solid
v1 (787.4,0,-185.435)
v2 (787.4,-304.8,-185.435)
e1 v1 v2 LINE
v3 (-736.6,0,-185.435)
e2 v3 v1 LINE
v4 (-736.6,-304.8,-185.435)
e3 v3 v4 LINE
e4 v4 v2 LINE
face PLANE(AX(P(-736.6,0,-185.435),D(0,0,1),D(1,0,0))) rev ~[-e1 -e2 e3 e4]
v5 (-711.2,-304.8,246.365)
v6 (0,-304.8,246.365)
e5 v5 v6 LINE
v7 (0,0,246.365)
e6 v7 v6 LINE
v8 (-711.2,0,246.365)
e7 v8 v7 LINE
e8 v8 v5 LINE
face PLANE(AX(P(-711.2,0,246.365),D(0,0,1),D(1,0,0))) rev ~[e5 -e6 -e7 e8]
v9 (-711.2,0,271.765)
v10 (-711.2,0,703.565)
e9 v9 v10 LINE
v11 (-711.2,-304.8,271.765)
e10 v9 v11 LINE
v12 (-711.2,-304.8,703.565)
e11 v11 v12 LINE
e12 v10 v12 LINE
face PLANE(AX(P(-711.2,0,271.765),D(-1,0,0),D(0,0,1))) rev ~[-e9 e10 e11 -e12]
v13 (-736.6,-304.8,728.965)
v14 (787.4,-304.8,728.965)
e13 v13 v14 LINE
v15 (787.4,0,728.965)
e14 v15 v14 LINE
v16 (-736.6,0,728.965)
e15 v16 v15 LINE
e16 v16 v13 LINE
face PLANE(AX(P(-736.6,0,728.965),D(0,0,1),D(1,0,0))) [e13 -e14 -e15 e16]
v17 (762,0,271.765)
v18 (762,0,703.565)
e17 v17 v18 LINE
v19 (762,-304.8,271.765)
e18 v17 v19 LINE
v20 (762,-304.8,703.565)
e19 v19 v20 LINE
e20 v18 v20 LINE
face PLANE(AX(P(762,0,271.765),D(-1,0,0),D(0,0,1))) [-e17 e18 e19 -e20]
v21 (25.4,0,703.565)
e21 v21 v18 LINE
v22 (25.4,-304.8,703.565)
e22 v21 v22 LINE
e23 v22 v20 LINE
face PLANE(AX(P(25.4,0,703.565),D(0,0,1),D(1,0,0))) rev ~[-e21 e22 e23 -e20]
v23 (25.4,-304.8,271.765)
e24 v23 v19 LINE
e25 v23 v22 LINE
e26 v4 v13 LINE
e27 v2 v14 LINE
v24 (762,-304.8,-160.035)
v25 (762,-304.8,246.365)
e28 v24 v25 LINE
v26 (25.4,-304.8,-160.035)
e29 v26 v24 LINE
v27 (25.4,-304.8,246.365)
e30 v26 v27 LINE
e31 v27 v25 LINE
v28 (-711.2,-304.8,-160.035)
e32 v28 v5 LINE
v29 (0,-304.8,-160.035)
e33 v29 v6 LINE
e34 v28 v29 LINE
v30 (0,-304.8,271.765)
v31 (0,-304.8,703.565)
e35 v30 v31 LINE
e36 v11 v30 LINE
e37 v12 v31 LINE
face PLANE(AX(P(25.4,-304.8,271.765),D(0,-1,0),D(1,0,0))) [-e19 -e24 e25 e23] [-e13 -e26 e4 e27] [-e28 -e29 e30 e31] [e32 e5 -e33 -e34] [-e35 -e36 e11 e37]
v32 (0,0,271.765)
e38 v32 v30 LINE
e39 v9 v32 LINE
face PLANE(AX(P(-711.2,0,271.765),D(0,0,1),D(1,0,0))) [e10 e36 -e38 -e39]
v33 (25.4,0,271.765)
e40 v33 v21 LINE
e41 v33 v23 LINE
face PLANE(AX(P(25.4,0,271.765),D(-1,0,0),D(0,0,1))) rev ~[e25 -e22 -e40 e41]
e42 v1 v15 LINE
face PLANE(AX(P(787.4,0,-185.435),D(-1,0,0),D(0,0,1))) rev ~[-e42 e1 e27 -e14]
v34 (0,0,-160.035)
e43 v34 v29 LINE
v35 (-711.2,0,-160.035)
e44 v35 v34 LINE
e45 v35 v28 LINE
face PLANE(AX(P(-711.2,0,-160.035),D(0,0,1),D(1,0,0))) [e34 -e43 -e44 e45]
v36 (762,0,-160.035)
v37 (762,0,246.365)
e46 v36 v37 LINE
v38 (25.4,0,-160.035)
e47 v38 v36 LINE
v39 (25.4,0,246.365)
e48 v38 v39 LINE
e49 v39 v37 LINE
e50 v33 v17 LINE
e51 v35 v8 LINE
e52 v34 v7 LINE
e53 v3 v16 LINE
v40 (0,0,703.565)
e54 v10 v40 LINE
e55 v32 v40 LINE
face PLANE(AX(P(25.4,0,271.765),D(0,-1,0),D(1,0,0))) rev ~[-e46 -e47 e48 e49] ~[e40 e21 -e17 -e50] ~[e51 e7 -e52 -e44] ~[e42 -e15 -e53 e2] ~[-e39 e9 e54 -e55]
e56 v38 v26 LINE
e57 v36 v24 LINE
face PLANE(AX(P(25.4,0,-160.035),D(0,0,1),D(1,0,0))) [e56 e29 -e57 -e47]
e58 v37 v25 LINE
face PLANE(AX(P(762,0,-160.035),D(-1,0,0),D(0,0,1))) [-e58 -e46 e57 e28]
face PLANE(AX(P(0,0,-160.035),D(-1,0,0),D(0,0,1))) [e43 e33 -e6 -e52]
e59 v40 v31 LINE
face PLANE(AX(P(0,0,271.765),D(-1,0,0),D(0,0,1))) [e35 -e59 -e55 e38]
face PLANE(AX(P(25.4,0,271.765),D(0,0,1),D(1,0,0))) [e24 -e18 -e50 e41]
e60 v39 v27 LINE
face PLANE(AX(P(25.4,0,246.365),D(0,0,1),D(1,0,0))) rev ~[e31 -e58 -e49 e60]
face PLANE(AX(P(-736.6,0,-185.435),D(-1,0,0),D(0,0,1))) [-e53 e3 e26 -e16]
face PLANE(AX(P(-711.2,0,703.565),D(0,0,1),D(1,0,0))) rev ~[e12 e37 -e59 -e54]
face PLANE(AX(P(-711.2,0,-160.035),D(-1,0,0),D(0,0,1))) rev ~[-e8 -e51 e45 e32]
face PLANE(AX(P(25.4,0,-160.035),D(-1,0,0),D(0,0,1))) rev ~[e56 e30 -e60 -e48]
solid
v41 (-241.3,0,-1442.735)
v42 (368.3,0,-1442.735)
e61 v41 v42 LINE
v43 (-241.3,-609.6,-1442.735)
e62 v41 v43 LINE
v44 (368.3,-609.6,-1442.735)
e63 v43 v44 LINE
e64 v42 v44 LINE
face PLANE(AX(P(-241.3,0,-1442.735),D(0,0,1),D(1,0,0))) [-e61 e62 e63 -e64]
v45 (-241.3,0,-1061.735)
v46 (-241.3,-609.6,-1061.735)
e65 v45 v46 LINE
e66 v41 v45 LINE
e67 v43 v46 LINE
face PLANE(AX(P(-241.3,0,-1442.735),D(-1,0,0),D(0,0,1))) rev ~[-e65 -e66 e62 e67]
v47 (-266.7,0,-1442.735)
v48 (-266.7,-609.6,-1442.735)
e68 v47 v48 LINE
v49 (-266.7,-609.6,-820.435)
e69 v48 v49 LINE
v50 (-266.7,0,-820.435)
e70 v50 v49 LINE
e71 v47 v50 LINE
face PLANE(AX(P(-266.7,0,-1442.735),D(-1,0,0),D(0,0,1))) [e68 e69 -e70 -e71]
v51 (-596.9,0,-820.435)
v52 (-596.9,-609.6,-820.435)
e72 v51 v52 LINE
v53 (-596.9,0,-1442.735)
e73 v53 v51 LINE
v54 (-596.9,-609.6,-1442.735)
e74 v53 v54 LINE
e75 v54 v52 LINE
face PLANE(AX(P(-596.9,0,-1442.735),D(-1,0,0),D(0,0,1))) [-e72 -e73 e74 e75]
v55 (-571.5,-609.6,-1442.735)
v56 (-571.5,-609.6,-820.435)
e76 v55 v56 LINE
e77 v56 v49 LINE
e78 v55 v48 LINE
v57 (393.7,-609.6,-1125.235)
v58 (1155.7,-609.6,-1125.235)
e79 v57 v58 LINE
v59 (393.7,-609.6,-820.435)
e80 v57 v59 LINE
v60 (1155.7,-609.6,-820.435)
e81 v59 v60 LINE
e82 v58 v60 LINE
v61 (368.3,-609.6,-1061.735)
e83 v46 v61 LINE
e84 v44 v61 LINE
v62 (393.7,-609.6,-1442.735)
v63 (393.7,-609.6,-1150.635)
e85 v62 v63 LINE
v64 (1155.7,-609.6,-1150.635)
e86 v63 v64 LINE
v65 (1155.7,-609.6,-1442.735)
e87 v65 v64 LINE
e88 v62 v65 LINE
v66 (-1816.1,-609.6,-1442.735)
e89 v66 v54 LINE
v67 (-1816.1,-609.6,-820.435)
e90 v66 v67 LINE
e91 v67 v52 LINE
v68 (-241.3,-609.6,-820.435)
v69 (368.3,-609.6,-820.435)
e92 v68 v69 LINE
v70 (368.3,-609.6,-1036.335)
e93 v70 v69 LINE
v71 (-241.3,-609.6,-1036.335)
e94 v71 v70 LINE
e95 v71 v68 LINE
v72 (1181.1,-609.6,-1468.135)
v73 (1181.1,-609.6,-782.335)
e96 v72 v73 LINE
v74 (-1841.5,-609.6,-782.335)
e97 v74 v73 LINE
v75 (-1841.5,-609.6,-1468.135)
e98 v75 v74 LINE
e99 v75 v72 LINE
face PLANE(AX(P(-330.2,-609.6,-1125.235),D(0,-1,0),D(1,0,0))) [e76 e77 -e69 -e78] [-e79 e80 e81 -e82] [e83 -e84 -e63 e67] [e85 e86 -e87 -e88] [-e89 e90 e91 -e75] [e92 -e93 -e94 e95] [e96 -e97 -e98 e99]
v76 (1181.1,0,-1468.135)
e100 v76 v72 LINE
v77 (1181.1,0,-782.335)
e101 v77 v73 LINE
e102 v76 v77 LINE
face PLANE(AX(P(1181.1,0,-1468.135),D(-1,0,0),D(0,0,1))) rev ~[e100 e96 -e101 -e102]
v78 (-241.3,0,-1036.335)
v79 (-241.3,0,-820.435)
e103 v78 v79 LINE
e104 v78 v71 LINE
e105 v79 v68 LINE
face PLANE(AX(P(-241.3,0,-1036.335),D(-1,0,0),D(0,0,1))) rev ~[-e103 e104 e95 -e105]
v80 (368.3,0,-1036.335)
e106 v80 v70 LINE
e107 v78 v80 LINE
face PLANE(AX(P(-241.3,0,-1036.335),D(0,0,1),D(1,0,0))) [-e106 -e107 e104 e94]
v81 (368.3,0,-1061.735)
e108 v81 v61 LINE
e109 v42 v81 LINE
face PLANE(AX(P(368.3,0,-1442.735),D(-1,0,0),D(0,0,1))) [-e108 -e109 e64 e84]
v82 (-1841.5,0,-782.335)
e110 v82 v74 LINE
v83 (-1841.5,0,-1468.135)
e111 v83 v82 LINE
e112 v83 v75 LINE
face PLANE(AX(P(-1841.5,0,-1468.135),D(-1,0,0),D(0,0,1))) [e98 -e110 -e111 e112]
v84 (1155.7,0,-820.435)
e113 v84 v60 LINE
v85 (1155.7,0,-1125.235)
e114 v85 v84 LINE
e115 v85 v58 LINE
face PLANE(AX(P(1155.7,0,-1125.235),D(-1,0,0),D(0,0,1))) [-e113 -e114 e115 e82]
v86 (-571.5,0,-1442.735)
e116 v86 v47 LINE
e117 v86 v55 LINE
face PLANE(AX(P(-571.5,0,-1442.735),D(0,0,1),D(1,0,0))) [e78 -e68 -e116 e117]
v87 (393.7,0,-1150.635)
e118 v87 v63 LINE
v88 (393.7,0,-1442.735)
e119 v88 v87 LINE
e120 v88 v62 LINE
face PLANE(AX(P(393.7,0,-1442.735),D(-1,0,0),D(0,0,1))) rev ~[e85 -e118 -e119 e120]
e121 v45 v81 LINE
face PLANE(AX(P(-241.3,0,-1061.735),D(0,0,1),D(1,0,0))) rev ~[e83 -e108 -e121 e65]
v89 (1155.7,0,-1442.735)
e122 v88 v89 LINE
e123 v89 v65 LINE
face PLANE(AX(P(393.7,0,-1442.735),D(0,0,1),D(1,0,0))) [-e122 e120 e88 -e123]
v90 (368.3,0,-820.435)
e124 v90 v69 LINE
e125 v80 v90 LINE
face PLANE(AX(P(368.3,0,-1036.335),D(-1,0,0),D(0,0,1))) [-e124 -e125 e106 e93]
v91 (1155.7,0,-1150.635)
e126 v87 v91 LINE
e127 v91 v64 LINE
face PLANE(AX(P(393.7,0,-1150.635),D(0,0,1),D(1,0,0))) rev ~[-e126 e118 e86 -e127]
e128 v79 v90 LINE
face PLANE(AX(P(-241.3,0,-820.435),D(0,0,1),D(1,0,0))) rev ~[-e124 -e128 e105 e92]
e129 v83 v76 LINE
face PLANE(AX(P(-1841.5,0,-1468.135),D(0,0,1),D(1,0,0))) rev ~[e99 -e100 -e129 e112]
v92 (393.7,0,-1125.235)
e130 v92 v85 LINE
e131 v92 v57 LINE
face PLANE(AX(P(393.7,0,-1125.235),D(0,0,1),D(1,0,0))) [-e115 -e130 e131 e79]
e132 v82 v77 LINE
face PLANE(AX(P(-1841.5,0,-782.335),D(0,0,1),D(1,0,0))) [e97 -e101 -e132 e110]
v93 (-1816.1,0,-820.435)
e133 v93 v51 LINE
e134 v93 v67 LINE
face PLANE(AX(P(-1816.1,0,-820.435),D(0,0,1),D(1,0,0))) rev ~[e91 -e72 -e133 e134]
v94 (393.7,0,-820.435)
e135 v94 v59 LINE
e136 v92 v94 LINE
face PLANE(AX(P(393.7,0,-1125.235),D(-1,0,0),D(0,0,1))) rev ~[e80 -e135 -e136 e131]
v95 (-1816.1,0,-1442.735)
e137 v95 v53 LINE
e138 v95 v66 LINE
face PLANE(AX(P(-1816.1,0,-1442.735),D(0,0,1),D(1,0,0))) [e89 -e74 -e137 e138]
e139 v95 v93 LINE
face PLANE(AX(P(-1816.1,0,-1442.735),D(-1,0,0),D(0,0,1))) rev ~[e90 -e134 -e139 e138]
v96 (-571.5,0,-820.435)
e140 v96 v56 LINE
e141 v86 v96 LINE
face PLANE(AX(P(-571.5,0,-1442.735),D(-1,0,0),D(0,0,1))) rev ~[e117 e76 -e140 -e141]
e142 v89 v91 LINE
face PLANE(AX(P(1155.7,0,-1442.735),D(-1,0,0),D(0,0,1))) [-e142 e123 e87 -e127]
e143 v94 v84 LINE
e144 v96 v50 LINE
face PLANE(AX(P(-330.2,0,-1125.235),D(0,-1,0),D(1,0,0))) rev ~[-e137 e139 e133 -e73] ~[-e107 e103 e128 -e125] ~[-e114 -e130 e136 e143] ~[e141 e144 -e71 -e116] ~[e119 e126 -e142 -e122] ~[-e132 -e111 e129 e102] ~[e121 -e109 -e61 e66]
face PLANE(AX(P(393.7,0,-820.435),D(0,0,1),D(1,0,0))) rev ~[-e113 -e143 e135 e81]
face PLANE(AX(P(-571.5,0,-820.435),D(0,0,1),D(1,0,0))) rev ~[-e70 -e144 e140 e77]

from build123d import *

# Parameters (mm, degrees)
F0_W     = 1524
F0_H     = 914.4
F0_W_2   = 711.2
F0_H_2   = 406.4
F0_H_3   = 431.8
F0_W_3   = 736.6
F2_DEPTH = 304.8
F0_W_4   = 3022.6
F0_H_4   = 685.8
F0_W_5   = 1219.2
F0_H_5   = 622.3
F0_W_6   = 304.8
F0_W_7   = 609.6
F0_H_6   = 381
F0_W_8   = 762
F0_H_7   = 292.1
F0_H_8   = 215.9
F0_H_9   = 304.8
F3_DEPTH = 609.6


# Not quite as in the source:
# - the program builds the solid bodies; features that only make, move or delete a surface that nothing else refers to are left out


with BuildPart() as f2:
    # F0 (on Front) → F2 (new body)
    with BuildSketch(Plane.XZ):
        with Locations((25.4, 271.7650001948)):
            Rectangle(F0_W, F0_H)
        with Locations((-355.6, 43.1650001948)):
            Rectangle(F0_W_2, F0_H_2, mode=Mode.SUBTRACT)
        with Locations((-355.6, 487.6650001948)):
            Rectangle(F0_W_2, F0_H_3, mode=Mode.SUBTRACT)
        with Locations((393.7, 43.1650001948)):
            Rectangle(F0_W_3, F0_H_2, mode=Mode.SUBTRACT)
        with Locations((393.7, 487.6650001948)):
            Rectangle(F0_W_3, F0_H_3, mode=Mode.SUBTRACT)
    extrude(amount=F2_DEPTH)


with BuildPart() as f3:
    # F0 (on Front) → F3 (new body)
    with BuildSketch(Plane.XZ):
        with Locations((-330.2, -1125.2349998052)):
            Rectangle(F0_W_4, F0_H_4)
        with Locations((-1206.5, -1131.5849998052)):
            Rectangle(F0_W_5, F0_H_5, mode=Mode.SUBTRACT)
        with Locations((-419.1, -1131.5849998052)):
            Rectangle(F0_W_6, F0_H_5, mode=Mode.SUBTRACT)
        with Locations((63.5, -1252.2349998052)):
            Rectangle(F0_W_7, F0_H_6, mode=Mode.SUBTRACT)
        with Locations((774.7, -1296.6849998052)):
            Rectangle(F0_W_8, F0_H_7, mode=Mode.SUBTRACT)
        with Locations((63.5, -928.3849998052)):
            Rectangle(F0_W_7, F0_H_8, mode=Mode.SUBTRACT)
        with Locations((774.7, -972.8349998052)):
            Rectangle(F0_W_8, F0_H_9, mode=Mode.SUBTRACT)
    extrude(amount=F3_DEPTH)


solid = Compound([f2.part, f3.part])
